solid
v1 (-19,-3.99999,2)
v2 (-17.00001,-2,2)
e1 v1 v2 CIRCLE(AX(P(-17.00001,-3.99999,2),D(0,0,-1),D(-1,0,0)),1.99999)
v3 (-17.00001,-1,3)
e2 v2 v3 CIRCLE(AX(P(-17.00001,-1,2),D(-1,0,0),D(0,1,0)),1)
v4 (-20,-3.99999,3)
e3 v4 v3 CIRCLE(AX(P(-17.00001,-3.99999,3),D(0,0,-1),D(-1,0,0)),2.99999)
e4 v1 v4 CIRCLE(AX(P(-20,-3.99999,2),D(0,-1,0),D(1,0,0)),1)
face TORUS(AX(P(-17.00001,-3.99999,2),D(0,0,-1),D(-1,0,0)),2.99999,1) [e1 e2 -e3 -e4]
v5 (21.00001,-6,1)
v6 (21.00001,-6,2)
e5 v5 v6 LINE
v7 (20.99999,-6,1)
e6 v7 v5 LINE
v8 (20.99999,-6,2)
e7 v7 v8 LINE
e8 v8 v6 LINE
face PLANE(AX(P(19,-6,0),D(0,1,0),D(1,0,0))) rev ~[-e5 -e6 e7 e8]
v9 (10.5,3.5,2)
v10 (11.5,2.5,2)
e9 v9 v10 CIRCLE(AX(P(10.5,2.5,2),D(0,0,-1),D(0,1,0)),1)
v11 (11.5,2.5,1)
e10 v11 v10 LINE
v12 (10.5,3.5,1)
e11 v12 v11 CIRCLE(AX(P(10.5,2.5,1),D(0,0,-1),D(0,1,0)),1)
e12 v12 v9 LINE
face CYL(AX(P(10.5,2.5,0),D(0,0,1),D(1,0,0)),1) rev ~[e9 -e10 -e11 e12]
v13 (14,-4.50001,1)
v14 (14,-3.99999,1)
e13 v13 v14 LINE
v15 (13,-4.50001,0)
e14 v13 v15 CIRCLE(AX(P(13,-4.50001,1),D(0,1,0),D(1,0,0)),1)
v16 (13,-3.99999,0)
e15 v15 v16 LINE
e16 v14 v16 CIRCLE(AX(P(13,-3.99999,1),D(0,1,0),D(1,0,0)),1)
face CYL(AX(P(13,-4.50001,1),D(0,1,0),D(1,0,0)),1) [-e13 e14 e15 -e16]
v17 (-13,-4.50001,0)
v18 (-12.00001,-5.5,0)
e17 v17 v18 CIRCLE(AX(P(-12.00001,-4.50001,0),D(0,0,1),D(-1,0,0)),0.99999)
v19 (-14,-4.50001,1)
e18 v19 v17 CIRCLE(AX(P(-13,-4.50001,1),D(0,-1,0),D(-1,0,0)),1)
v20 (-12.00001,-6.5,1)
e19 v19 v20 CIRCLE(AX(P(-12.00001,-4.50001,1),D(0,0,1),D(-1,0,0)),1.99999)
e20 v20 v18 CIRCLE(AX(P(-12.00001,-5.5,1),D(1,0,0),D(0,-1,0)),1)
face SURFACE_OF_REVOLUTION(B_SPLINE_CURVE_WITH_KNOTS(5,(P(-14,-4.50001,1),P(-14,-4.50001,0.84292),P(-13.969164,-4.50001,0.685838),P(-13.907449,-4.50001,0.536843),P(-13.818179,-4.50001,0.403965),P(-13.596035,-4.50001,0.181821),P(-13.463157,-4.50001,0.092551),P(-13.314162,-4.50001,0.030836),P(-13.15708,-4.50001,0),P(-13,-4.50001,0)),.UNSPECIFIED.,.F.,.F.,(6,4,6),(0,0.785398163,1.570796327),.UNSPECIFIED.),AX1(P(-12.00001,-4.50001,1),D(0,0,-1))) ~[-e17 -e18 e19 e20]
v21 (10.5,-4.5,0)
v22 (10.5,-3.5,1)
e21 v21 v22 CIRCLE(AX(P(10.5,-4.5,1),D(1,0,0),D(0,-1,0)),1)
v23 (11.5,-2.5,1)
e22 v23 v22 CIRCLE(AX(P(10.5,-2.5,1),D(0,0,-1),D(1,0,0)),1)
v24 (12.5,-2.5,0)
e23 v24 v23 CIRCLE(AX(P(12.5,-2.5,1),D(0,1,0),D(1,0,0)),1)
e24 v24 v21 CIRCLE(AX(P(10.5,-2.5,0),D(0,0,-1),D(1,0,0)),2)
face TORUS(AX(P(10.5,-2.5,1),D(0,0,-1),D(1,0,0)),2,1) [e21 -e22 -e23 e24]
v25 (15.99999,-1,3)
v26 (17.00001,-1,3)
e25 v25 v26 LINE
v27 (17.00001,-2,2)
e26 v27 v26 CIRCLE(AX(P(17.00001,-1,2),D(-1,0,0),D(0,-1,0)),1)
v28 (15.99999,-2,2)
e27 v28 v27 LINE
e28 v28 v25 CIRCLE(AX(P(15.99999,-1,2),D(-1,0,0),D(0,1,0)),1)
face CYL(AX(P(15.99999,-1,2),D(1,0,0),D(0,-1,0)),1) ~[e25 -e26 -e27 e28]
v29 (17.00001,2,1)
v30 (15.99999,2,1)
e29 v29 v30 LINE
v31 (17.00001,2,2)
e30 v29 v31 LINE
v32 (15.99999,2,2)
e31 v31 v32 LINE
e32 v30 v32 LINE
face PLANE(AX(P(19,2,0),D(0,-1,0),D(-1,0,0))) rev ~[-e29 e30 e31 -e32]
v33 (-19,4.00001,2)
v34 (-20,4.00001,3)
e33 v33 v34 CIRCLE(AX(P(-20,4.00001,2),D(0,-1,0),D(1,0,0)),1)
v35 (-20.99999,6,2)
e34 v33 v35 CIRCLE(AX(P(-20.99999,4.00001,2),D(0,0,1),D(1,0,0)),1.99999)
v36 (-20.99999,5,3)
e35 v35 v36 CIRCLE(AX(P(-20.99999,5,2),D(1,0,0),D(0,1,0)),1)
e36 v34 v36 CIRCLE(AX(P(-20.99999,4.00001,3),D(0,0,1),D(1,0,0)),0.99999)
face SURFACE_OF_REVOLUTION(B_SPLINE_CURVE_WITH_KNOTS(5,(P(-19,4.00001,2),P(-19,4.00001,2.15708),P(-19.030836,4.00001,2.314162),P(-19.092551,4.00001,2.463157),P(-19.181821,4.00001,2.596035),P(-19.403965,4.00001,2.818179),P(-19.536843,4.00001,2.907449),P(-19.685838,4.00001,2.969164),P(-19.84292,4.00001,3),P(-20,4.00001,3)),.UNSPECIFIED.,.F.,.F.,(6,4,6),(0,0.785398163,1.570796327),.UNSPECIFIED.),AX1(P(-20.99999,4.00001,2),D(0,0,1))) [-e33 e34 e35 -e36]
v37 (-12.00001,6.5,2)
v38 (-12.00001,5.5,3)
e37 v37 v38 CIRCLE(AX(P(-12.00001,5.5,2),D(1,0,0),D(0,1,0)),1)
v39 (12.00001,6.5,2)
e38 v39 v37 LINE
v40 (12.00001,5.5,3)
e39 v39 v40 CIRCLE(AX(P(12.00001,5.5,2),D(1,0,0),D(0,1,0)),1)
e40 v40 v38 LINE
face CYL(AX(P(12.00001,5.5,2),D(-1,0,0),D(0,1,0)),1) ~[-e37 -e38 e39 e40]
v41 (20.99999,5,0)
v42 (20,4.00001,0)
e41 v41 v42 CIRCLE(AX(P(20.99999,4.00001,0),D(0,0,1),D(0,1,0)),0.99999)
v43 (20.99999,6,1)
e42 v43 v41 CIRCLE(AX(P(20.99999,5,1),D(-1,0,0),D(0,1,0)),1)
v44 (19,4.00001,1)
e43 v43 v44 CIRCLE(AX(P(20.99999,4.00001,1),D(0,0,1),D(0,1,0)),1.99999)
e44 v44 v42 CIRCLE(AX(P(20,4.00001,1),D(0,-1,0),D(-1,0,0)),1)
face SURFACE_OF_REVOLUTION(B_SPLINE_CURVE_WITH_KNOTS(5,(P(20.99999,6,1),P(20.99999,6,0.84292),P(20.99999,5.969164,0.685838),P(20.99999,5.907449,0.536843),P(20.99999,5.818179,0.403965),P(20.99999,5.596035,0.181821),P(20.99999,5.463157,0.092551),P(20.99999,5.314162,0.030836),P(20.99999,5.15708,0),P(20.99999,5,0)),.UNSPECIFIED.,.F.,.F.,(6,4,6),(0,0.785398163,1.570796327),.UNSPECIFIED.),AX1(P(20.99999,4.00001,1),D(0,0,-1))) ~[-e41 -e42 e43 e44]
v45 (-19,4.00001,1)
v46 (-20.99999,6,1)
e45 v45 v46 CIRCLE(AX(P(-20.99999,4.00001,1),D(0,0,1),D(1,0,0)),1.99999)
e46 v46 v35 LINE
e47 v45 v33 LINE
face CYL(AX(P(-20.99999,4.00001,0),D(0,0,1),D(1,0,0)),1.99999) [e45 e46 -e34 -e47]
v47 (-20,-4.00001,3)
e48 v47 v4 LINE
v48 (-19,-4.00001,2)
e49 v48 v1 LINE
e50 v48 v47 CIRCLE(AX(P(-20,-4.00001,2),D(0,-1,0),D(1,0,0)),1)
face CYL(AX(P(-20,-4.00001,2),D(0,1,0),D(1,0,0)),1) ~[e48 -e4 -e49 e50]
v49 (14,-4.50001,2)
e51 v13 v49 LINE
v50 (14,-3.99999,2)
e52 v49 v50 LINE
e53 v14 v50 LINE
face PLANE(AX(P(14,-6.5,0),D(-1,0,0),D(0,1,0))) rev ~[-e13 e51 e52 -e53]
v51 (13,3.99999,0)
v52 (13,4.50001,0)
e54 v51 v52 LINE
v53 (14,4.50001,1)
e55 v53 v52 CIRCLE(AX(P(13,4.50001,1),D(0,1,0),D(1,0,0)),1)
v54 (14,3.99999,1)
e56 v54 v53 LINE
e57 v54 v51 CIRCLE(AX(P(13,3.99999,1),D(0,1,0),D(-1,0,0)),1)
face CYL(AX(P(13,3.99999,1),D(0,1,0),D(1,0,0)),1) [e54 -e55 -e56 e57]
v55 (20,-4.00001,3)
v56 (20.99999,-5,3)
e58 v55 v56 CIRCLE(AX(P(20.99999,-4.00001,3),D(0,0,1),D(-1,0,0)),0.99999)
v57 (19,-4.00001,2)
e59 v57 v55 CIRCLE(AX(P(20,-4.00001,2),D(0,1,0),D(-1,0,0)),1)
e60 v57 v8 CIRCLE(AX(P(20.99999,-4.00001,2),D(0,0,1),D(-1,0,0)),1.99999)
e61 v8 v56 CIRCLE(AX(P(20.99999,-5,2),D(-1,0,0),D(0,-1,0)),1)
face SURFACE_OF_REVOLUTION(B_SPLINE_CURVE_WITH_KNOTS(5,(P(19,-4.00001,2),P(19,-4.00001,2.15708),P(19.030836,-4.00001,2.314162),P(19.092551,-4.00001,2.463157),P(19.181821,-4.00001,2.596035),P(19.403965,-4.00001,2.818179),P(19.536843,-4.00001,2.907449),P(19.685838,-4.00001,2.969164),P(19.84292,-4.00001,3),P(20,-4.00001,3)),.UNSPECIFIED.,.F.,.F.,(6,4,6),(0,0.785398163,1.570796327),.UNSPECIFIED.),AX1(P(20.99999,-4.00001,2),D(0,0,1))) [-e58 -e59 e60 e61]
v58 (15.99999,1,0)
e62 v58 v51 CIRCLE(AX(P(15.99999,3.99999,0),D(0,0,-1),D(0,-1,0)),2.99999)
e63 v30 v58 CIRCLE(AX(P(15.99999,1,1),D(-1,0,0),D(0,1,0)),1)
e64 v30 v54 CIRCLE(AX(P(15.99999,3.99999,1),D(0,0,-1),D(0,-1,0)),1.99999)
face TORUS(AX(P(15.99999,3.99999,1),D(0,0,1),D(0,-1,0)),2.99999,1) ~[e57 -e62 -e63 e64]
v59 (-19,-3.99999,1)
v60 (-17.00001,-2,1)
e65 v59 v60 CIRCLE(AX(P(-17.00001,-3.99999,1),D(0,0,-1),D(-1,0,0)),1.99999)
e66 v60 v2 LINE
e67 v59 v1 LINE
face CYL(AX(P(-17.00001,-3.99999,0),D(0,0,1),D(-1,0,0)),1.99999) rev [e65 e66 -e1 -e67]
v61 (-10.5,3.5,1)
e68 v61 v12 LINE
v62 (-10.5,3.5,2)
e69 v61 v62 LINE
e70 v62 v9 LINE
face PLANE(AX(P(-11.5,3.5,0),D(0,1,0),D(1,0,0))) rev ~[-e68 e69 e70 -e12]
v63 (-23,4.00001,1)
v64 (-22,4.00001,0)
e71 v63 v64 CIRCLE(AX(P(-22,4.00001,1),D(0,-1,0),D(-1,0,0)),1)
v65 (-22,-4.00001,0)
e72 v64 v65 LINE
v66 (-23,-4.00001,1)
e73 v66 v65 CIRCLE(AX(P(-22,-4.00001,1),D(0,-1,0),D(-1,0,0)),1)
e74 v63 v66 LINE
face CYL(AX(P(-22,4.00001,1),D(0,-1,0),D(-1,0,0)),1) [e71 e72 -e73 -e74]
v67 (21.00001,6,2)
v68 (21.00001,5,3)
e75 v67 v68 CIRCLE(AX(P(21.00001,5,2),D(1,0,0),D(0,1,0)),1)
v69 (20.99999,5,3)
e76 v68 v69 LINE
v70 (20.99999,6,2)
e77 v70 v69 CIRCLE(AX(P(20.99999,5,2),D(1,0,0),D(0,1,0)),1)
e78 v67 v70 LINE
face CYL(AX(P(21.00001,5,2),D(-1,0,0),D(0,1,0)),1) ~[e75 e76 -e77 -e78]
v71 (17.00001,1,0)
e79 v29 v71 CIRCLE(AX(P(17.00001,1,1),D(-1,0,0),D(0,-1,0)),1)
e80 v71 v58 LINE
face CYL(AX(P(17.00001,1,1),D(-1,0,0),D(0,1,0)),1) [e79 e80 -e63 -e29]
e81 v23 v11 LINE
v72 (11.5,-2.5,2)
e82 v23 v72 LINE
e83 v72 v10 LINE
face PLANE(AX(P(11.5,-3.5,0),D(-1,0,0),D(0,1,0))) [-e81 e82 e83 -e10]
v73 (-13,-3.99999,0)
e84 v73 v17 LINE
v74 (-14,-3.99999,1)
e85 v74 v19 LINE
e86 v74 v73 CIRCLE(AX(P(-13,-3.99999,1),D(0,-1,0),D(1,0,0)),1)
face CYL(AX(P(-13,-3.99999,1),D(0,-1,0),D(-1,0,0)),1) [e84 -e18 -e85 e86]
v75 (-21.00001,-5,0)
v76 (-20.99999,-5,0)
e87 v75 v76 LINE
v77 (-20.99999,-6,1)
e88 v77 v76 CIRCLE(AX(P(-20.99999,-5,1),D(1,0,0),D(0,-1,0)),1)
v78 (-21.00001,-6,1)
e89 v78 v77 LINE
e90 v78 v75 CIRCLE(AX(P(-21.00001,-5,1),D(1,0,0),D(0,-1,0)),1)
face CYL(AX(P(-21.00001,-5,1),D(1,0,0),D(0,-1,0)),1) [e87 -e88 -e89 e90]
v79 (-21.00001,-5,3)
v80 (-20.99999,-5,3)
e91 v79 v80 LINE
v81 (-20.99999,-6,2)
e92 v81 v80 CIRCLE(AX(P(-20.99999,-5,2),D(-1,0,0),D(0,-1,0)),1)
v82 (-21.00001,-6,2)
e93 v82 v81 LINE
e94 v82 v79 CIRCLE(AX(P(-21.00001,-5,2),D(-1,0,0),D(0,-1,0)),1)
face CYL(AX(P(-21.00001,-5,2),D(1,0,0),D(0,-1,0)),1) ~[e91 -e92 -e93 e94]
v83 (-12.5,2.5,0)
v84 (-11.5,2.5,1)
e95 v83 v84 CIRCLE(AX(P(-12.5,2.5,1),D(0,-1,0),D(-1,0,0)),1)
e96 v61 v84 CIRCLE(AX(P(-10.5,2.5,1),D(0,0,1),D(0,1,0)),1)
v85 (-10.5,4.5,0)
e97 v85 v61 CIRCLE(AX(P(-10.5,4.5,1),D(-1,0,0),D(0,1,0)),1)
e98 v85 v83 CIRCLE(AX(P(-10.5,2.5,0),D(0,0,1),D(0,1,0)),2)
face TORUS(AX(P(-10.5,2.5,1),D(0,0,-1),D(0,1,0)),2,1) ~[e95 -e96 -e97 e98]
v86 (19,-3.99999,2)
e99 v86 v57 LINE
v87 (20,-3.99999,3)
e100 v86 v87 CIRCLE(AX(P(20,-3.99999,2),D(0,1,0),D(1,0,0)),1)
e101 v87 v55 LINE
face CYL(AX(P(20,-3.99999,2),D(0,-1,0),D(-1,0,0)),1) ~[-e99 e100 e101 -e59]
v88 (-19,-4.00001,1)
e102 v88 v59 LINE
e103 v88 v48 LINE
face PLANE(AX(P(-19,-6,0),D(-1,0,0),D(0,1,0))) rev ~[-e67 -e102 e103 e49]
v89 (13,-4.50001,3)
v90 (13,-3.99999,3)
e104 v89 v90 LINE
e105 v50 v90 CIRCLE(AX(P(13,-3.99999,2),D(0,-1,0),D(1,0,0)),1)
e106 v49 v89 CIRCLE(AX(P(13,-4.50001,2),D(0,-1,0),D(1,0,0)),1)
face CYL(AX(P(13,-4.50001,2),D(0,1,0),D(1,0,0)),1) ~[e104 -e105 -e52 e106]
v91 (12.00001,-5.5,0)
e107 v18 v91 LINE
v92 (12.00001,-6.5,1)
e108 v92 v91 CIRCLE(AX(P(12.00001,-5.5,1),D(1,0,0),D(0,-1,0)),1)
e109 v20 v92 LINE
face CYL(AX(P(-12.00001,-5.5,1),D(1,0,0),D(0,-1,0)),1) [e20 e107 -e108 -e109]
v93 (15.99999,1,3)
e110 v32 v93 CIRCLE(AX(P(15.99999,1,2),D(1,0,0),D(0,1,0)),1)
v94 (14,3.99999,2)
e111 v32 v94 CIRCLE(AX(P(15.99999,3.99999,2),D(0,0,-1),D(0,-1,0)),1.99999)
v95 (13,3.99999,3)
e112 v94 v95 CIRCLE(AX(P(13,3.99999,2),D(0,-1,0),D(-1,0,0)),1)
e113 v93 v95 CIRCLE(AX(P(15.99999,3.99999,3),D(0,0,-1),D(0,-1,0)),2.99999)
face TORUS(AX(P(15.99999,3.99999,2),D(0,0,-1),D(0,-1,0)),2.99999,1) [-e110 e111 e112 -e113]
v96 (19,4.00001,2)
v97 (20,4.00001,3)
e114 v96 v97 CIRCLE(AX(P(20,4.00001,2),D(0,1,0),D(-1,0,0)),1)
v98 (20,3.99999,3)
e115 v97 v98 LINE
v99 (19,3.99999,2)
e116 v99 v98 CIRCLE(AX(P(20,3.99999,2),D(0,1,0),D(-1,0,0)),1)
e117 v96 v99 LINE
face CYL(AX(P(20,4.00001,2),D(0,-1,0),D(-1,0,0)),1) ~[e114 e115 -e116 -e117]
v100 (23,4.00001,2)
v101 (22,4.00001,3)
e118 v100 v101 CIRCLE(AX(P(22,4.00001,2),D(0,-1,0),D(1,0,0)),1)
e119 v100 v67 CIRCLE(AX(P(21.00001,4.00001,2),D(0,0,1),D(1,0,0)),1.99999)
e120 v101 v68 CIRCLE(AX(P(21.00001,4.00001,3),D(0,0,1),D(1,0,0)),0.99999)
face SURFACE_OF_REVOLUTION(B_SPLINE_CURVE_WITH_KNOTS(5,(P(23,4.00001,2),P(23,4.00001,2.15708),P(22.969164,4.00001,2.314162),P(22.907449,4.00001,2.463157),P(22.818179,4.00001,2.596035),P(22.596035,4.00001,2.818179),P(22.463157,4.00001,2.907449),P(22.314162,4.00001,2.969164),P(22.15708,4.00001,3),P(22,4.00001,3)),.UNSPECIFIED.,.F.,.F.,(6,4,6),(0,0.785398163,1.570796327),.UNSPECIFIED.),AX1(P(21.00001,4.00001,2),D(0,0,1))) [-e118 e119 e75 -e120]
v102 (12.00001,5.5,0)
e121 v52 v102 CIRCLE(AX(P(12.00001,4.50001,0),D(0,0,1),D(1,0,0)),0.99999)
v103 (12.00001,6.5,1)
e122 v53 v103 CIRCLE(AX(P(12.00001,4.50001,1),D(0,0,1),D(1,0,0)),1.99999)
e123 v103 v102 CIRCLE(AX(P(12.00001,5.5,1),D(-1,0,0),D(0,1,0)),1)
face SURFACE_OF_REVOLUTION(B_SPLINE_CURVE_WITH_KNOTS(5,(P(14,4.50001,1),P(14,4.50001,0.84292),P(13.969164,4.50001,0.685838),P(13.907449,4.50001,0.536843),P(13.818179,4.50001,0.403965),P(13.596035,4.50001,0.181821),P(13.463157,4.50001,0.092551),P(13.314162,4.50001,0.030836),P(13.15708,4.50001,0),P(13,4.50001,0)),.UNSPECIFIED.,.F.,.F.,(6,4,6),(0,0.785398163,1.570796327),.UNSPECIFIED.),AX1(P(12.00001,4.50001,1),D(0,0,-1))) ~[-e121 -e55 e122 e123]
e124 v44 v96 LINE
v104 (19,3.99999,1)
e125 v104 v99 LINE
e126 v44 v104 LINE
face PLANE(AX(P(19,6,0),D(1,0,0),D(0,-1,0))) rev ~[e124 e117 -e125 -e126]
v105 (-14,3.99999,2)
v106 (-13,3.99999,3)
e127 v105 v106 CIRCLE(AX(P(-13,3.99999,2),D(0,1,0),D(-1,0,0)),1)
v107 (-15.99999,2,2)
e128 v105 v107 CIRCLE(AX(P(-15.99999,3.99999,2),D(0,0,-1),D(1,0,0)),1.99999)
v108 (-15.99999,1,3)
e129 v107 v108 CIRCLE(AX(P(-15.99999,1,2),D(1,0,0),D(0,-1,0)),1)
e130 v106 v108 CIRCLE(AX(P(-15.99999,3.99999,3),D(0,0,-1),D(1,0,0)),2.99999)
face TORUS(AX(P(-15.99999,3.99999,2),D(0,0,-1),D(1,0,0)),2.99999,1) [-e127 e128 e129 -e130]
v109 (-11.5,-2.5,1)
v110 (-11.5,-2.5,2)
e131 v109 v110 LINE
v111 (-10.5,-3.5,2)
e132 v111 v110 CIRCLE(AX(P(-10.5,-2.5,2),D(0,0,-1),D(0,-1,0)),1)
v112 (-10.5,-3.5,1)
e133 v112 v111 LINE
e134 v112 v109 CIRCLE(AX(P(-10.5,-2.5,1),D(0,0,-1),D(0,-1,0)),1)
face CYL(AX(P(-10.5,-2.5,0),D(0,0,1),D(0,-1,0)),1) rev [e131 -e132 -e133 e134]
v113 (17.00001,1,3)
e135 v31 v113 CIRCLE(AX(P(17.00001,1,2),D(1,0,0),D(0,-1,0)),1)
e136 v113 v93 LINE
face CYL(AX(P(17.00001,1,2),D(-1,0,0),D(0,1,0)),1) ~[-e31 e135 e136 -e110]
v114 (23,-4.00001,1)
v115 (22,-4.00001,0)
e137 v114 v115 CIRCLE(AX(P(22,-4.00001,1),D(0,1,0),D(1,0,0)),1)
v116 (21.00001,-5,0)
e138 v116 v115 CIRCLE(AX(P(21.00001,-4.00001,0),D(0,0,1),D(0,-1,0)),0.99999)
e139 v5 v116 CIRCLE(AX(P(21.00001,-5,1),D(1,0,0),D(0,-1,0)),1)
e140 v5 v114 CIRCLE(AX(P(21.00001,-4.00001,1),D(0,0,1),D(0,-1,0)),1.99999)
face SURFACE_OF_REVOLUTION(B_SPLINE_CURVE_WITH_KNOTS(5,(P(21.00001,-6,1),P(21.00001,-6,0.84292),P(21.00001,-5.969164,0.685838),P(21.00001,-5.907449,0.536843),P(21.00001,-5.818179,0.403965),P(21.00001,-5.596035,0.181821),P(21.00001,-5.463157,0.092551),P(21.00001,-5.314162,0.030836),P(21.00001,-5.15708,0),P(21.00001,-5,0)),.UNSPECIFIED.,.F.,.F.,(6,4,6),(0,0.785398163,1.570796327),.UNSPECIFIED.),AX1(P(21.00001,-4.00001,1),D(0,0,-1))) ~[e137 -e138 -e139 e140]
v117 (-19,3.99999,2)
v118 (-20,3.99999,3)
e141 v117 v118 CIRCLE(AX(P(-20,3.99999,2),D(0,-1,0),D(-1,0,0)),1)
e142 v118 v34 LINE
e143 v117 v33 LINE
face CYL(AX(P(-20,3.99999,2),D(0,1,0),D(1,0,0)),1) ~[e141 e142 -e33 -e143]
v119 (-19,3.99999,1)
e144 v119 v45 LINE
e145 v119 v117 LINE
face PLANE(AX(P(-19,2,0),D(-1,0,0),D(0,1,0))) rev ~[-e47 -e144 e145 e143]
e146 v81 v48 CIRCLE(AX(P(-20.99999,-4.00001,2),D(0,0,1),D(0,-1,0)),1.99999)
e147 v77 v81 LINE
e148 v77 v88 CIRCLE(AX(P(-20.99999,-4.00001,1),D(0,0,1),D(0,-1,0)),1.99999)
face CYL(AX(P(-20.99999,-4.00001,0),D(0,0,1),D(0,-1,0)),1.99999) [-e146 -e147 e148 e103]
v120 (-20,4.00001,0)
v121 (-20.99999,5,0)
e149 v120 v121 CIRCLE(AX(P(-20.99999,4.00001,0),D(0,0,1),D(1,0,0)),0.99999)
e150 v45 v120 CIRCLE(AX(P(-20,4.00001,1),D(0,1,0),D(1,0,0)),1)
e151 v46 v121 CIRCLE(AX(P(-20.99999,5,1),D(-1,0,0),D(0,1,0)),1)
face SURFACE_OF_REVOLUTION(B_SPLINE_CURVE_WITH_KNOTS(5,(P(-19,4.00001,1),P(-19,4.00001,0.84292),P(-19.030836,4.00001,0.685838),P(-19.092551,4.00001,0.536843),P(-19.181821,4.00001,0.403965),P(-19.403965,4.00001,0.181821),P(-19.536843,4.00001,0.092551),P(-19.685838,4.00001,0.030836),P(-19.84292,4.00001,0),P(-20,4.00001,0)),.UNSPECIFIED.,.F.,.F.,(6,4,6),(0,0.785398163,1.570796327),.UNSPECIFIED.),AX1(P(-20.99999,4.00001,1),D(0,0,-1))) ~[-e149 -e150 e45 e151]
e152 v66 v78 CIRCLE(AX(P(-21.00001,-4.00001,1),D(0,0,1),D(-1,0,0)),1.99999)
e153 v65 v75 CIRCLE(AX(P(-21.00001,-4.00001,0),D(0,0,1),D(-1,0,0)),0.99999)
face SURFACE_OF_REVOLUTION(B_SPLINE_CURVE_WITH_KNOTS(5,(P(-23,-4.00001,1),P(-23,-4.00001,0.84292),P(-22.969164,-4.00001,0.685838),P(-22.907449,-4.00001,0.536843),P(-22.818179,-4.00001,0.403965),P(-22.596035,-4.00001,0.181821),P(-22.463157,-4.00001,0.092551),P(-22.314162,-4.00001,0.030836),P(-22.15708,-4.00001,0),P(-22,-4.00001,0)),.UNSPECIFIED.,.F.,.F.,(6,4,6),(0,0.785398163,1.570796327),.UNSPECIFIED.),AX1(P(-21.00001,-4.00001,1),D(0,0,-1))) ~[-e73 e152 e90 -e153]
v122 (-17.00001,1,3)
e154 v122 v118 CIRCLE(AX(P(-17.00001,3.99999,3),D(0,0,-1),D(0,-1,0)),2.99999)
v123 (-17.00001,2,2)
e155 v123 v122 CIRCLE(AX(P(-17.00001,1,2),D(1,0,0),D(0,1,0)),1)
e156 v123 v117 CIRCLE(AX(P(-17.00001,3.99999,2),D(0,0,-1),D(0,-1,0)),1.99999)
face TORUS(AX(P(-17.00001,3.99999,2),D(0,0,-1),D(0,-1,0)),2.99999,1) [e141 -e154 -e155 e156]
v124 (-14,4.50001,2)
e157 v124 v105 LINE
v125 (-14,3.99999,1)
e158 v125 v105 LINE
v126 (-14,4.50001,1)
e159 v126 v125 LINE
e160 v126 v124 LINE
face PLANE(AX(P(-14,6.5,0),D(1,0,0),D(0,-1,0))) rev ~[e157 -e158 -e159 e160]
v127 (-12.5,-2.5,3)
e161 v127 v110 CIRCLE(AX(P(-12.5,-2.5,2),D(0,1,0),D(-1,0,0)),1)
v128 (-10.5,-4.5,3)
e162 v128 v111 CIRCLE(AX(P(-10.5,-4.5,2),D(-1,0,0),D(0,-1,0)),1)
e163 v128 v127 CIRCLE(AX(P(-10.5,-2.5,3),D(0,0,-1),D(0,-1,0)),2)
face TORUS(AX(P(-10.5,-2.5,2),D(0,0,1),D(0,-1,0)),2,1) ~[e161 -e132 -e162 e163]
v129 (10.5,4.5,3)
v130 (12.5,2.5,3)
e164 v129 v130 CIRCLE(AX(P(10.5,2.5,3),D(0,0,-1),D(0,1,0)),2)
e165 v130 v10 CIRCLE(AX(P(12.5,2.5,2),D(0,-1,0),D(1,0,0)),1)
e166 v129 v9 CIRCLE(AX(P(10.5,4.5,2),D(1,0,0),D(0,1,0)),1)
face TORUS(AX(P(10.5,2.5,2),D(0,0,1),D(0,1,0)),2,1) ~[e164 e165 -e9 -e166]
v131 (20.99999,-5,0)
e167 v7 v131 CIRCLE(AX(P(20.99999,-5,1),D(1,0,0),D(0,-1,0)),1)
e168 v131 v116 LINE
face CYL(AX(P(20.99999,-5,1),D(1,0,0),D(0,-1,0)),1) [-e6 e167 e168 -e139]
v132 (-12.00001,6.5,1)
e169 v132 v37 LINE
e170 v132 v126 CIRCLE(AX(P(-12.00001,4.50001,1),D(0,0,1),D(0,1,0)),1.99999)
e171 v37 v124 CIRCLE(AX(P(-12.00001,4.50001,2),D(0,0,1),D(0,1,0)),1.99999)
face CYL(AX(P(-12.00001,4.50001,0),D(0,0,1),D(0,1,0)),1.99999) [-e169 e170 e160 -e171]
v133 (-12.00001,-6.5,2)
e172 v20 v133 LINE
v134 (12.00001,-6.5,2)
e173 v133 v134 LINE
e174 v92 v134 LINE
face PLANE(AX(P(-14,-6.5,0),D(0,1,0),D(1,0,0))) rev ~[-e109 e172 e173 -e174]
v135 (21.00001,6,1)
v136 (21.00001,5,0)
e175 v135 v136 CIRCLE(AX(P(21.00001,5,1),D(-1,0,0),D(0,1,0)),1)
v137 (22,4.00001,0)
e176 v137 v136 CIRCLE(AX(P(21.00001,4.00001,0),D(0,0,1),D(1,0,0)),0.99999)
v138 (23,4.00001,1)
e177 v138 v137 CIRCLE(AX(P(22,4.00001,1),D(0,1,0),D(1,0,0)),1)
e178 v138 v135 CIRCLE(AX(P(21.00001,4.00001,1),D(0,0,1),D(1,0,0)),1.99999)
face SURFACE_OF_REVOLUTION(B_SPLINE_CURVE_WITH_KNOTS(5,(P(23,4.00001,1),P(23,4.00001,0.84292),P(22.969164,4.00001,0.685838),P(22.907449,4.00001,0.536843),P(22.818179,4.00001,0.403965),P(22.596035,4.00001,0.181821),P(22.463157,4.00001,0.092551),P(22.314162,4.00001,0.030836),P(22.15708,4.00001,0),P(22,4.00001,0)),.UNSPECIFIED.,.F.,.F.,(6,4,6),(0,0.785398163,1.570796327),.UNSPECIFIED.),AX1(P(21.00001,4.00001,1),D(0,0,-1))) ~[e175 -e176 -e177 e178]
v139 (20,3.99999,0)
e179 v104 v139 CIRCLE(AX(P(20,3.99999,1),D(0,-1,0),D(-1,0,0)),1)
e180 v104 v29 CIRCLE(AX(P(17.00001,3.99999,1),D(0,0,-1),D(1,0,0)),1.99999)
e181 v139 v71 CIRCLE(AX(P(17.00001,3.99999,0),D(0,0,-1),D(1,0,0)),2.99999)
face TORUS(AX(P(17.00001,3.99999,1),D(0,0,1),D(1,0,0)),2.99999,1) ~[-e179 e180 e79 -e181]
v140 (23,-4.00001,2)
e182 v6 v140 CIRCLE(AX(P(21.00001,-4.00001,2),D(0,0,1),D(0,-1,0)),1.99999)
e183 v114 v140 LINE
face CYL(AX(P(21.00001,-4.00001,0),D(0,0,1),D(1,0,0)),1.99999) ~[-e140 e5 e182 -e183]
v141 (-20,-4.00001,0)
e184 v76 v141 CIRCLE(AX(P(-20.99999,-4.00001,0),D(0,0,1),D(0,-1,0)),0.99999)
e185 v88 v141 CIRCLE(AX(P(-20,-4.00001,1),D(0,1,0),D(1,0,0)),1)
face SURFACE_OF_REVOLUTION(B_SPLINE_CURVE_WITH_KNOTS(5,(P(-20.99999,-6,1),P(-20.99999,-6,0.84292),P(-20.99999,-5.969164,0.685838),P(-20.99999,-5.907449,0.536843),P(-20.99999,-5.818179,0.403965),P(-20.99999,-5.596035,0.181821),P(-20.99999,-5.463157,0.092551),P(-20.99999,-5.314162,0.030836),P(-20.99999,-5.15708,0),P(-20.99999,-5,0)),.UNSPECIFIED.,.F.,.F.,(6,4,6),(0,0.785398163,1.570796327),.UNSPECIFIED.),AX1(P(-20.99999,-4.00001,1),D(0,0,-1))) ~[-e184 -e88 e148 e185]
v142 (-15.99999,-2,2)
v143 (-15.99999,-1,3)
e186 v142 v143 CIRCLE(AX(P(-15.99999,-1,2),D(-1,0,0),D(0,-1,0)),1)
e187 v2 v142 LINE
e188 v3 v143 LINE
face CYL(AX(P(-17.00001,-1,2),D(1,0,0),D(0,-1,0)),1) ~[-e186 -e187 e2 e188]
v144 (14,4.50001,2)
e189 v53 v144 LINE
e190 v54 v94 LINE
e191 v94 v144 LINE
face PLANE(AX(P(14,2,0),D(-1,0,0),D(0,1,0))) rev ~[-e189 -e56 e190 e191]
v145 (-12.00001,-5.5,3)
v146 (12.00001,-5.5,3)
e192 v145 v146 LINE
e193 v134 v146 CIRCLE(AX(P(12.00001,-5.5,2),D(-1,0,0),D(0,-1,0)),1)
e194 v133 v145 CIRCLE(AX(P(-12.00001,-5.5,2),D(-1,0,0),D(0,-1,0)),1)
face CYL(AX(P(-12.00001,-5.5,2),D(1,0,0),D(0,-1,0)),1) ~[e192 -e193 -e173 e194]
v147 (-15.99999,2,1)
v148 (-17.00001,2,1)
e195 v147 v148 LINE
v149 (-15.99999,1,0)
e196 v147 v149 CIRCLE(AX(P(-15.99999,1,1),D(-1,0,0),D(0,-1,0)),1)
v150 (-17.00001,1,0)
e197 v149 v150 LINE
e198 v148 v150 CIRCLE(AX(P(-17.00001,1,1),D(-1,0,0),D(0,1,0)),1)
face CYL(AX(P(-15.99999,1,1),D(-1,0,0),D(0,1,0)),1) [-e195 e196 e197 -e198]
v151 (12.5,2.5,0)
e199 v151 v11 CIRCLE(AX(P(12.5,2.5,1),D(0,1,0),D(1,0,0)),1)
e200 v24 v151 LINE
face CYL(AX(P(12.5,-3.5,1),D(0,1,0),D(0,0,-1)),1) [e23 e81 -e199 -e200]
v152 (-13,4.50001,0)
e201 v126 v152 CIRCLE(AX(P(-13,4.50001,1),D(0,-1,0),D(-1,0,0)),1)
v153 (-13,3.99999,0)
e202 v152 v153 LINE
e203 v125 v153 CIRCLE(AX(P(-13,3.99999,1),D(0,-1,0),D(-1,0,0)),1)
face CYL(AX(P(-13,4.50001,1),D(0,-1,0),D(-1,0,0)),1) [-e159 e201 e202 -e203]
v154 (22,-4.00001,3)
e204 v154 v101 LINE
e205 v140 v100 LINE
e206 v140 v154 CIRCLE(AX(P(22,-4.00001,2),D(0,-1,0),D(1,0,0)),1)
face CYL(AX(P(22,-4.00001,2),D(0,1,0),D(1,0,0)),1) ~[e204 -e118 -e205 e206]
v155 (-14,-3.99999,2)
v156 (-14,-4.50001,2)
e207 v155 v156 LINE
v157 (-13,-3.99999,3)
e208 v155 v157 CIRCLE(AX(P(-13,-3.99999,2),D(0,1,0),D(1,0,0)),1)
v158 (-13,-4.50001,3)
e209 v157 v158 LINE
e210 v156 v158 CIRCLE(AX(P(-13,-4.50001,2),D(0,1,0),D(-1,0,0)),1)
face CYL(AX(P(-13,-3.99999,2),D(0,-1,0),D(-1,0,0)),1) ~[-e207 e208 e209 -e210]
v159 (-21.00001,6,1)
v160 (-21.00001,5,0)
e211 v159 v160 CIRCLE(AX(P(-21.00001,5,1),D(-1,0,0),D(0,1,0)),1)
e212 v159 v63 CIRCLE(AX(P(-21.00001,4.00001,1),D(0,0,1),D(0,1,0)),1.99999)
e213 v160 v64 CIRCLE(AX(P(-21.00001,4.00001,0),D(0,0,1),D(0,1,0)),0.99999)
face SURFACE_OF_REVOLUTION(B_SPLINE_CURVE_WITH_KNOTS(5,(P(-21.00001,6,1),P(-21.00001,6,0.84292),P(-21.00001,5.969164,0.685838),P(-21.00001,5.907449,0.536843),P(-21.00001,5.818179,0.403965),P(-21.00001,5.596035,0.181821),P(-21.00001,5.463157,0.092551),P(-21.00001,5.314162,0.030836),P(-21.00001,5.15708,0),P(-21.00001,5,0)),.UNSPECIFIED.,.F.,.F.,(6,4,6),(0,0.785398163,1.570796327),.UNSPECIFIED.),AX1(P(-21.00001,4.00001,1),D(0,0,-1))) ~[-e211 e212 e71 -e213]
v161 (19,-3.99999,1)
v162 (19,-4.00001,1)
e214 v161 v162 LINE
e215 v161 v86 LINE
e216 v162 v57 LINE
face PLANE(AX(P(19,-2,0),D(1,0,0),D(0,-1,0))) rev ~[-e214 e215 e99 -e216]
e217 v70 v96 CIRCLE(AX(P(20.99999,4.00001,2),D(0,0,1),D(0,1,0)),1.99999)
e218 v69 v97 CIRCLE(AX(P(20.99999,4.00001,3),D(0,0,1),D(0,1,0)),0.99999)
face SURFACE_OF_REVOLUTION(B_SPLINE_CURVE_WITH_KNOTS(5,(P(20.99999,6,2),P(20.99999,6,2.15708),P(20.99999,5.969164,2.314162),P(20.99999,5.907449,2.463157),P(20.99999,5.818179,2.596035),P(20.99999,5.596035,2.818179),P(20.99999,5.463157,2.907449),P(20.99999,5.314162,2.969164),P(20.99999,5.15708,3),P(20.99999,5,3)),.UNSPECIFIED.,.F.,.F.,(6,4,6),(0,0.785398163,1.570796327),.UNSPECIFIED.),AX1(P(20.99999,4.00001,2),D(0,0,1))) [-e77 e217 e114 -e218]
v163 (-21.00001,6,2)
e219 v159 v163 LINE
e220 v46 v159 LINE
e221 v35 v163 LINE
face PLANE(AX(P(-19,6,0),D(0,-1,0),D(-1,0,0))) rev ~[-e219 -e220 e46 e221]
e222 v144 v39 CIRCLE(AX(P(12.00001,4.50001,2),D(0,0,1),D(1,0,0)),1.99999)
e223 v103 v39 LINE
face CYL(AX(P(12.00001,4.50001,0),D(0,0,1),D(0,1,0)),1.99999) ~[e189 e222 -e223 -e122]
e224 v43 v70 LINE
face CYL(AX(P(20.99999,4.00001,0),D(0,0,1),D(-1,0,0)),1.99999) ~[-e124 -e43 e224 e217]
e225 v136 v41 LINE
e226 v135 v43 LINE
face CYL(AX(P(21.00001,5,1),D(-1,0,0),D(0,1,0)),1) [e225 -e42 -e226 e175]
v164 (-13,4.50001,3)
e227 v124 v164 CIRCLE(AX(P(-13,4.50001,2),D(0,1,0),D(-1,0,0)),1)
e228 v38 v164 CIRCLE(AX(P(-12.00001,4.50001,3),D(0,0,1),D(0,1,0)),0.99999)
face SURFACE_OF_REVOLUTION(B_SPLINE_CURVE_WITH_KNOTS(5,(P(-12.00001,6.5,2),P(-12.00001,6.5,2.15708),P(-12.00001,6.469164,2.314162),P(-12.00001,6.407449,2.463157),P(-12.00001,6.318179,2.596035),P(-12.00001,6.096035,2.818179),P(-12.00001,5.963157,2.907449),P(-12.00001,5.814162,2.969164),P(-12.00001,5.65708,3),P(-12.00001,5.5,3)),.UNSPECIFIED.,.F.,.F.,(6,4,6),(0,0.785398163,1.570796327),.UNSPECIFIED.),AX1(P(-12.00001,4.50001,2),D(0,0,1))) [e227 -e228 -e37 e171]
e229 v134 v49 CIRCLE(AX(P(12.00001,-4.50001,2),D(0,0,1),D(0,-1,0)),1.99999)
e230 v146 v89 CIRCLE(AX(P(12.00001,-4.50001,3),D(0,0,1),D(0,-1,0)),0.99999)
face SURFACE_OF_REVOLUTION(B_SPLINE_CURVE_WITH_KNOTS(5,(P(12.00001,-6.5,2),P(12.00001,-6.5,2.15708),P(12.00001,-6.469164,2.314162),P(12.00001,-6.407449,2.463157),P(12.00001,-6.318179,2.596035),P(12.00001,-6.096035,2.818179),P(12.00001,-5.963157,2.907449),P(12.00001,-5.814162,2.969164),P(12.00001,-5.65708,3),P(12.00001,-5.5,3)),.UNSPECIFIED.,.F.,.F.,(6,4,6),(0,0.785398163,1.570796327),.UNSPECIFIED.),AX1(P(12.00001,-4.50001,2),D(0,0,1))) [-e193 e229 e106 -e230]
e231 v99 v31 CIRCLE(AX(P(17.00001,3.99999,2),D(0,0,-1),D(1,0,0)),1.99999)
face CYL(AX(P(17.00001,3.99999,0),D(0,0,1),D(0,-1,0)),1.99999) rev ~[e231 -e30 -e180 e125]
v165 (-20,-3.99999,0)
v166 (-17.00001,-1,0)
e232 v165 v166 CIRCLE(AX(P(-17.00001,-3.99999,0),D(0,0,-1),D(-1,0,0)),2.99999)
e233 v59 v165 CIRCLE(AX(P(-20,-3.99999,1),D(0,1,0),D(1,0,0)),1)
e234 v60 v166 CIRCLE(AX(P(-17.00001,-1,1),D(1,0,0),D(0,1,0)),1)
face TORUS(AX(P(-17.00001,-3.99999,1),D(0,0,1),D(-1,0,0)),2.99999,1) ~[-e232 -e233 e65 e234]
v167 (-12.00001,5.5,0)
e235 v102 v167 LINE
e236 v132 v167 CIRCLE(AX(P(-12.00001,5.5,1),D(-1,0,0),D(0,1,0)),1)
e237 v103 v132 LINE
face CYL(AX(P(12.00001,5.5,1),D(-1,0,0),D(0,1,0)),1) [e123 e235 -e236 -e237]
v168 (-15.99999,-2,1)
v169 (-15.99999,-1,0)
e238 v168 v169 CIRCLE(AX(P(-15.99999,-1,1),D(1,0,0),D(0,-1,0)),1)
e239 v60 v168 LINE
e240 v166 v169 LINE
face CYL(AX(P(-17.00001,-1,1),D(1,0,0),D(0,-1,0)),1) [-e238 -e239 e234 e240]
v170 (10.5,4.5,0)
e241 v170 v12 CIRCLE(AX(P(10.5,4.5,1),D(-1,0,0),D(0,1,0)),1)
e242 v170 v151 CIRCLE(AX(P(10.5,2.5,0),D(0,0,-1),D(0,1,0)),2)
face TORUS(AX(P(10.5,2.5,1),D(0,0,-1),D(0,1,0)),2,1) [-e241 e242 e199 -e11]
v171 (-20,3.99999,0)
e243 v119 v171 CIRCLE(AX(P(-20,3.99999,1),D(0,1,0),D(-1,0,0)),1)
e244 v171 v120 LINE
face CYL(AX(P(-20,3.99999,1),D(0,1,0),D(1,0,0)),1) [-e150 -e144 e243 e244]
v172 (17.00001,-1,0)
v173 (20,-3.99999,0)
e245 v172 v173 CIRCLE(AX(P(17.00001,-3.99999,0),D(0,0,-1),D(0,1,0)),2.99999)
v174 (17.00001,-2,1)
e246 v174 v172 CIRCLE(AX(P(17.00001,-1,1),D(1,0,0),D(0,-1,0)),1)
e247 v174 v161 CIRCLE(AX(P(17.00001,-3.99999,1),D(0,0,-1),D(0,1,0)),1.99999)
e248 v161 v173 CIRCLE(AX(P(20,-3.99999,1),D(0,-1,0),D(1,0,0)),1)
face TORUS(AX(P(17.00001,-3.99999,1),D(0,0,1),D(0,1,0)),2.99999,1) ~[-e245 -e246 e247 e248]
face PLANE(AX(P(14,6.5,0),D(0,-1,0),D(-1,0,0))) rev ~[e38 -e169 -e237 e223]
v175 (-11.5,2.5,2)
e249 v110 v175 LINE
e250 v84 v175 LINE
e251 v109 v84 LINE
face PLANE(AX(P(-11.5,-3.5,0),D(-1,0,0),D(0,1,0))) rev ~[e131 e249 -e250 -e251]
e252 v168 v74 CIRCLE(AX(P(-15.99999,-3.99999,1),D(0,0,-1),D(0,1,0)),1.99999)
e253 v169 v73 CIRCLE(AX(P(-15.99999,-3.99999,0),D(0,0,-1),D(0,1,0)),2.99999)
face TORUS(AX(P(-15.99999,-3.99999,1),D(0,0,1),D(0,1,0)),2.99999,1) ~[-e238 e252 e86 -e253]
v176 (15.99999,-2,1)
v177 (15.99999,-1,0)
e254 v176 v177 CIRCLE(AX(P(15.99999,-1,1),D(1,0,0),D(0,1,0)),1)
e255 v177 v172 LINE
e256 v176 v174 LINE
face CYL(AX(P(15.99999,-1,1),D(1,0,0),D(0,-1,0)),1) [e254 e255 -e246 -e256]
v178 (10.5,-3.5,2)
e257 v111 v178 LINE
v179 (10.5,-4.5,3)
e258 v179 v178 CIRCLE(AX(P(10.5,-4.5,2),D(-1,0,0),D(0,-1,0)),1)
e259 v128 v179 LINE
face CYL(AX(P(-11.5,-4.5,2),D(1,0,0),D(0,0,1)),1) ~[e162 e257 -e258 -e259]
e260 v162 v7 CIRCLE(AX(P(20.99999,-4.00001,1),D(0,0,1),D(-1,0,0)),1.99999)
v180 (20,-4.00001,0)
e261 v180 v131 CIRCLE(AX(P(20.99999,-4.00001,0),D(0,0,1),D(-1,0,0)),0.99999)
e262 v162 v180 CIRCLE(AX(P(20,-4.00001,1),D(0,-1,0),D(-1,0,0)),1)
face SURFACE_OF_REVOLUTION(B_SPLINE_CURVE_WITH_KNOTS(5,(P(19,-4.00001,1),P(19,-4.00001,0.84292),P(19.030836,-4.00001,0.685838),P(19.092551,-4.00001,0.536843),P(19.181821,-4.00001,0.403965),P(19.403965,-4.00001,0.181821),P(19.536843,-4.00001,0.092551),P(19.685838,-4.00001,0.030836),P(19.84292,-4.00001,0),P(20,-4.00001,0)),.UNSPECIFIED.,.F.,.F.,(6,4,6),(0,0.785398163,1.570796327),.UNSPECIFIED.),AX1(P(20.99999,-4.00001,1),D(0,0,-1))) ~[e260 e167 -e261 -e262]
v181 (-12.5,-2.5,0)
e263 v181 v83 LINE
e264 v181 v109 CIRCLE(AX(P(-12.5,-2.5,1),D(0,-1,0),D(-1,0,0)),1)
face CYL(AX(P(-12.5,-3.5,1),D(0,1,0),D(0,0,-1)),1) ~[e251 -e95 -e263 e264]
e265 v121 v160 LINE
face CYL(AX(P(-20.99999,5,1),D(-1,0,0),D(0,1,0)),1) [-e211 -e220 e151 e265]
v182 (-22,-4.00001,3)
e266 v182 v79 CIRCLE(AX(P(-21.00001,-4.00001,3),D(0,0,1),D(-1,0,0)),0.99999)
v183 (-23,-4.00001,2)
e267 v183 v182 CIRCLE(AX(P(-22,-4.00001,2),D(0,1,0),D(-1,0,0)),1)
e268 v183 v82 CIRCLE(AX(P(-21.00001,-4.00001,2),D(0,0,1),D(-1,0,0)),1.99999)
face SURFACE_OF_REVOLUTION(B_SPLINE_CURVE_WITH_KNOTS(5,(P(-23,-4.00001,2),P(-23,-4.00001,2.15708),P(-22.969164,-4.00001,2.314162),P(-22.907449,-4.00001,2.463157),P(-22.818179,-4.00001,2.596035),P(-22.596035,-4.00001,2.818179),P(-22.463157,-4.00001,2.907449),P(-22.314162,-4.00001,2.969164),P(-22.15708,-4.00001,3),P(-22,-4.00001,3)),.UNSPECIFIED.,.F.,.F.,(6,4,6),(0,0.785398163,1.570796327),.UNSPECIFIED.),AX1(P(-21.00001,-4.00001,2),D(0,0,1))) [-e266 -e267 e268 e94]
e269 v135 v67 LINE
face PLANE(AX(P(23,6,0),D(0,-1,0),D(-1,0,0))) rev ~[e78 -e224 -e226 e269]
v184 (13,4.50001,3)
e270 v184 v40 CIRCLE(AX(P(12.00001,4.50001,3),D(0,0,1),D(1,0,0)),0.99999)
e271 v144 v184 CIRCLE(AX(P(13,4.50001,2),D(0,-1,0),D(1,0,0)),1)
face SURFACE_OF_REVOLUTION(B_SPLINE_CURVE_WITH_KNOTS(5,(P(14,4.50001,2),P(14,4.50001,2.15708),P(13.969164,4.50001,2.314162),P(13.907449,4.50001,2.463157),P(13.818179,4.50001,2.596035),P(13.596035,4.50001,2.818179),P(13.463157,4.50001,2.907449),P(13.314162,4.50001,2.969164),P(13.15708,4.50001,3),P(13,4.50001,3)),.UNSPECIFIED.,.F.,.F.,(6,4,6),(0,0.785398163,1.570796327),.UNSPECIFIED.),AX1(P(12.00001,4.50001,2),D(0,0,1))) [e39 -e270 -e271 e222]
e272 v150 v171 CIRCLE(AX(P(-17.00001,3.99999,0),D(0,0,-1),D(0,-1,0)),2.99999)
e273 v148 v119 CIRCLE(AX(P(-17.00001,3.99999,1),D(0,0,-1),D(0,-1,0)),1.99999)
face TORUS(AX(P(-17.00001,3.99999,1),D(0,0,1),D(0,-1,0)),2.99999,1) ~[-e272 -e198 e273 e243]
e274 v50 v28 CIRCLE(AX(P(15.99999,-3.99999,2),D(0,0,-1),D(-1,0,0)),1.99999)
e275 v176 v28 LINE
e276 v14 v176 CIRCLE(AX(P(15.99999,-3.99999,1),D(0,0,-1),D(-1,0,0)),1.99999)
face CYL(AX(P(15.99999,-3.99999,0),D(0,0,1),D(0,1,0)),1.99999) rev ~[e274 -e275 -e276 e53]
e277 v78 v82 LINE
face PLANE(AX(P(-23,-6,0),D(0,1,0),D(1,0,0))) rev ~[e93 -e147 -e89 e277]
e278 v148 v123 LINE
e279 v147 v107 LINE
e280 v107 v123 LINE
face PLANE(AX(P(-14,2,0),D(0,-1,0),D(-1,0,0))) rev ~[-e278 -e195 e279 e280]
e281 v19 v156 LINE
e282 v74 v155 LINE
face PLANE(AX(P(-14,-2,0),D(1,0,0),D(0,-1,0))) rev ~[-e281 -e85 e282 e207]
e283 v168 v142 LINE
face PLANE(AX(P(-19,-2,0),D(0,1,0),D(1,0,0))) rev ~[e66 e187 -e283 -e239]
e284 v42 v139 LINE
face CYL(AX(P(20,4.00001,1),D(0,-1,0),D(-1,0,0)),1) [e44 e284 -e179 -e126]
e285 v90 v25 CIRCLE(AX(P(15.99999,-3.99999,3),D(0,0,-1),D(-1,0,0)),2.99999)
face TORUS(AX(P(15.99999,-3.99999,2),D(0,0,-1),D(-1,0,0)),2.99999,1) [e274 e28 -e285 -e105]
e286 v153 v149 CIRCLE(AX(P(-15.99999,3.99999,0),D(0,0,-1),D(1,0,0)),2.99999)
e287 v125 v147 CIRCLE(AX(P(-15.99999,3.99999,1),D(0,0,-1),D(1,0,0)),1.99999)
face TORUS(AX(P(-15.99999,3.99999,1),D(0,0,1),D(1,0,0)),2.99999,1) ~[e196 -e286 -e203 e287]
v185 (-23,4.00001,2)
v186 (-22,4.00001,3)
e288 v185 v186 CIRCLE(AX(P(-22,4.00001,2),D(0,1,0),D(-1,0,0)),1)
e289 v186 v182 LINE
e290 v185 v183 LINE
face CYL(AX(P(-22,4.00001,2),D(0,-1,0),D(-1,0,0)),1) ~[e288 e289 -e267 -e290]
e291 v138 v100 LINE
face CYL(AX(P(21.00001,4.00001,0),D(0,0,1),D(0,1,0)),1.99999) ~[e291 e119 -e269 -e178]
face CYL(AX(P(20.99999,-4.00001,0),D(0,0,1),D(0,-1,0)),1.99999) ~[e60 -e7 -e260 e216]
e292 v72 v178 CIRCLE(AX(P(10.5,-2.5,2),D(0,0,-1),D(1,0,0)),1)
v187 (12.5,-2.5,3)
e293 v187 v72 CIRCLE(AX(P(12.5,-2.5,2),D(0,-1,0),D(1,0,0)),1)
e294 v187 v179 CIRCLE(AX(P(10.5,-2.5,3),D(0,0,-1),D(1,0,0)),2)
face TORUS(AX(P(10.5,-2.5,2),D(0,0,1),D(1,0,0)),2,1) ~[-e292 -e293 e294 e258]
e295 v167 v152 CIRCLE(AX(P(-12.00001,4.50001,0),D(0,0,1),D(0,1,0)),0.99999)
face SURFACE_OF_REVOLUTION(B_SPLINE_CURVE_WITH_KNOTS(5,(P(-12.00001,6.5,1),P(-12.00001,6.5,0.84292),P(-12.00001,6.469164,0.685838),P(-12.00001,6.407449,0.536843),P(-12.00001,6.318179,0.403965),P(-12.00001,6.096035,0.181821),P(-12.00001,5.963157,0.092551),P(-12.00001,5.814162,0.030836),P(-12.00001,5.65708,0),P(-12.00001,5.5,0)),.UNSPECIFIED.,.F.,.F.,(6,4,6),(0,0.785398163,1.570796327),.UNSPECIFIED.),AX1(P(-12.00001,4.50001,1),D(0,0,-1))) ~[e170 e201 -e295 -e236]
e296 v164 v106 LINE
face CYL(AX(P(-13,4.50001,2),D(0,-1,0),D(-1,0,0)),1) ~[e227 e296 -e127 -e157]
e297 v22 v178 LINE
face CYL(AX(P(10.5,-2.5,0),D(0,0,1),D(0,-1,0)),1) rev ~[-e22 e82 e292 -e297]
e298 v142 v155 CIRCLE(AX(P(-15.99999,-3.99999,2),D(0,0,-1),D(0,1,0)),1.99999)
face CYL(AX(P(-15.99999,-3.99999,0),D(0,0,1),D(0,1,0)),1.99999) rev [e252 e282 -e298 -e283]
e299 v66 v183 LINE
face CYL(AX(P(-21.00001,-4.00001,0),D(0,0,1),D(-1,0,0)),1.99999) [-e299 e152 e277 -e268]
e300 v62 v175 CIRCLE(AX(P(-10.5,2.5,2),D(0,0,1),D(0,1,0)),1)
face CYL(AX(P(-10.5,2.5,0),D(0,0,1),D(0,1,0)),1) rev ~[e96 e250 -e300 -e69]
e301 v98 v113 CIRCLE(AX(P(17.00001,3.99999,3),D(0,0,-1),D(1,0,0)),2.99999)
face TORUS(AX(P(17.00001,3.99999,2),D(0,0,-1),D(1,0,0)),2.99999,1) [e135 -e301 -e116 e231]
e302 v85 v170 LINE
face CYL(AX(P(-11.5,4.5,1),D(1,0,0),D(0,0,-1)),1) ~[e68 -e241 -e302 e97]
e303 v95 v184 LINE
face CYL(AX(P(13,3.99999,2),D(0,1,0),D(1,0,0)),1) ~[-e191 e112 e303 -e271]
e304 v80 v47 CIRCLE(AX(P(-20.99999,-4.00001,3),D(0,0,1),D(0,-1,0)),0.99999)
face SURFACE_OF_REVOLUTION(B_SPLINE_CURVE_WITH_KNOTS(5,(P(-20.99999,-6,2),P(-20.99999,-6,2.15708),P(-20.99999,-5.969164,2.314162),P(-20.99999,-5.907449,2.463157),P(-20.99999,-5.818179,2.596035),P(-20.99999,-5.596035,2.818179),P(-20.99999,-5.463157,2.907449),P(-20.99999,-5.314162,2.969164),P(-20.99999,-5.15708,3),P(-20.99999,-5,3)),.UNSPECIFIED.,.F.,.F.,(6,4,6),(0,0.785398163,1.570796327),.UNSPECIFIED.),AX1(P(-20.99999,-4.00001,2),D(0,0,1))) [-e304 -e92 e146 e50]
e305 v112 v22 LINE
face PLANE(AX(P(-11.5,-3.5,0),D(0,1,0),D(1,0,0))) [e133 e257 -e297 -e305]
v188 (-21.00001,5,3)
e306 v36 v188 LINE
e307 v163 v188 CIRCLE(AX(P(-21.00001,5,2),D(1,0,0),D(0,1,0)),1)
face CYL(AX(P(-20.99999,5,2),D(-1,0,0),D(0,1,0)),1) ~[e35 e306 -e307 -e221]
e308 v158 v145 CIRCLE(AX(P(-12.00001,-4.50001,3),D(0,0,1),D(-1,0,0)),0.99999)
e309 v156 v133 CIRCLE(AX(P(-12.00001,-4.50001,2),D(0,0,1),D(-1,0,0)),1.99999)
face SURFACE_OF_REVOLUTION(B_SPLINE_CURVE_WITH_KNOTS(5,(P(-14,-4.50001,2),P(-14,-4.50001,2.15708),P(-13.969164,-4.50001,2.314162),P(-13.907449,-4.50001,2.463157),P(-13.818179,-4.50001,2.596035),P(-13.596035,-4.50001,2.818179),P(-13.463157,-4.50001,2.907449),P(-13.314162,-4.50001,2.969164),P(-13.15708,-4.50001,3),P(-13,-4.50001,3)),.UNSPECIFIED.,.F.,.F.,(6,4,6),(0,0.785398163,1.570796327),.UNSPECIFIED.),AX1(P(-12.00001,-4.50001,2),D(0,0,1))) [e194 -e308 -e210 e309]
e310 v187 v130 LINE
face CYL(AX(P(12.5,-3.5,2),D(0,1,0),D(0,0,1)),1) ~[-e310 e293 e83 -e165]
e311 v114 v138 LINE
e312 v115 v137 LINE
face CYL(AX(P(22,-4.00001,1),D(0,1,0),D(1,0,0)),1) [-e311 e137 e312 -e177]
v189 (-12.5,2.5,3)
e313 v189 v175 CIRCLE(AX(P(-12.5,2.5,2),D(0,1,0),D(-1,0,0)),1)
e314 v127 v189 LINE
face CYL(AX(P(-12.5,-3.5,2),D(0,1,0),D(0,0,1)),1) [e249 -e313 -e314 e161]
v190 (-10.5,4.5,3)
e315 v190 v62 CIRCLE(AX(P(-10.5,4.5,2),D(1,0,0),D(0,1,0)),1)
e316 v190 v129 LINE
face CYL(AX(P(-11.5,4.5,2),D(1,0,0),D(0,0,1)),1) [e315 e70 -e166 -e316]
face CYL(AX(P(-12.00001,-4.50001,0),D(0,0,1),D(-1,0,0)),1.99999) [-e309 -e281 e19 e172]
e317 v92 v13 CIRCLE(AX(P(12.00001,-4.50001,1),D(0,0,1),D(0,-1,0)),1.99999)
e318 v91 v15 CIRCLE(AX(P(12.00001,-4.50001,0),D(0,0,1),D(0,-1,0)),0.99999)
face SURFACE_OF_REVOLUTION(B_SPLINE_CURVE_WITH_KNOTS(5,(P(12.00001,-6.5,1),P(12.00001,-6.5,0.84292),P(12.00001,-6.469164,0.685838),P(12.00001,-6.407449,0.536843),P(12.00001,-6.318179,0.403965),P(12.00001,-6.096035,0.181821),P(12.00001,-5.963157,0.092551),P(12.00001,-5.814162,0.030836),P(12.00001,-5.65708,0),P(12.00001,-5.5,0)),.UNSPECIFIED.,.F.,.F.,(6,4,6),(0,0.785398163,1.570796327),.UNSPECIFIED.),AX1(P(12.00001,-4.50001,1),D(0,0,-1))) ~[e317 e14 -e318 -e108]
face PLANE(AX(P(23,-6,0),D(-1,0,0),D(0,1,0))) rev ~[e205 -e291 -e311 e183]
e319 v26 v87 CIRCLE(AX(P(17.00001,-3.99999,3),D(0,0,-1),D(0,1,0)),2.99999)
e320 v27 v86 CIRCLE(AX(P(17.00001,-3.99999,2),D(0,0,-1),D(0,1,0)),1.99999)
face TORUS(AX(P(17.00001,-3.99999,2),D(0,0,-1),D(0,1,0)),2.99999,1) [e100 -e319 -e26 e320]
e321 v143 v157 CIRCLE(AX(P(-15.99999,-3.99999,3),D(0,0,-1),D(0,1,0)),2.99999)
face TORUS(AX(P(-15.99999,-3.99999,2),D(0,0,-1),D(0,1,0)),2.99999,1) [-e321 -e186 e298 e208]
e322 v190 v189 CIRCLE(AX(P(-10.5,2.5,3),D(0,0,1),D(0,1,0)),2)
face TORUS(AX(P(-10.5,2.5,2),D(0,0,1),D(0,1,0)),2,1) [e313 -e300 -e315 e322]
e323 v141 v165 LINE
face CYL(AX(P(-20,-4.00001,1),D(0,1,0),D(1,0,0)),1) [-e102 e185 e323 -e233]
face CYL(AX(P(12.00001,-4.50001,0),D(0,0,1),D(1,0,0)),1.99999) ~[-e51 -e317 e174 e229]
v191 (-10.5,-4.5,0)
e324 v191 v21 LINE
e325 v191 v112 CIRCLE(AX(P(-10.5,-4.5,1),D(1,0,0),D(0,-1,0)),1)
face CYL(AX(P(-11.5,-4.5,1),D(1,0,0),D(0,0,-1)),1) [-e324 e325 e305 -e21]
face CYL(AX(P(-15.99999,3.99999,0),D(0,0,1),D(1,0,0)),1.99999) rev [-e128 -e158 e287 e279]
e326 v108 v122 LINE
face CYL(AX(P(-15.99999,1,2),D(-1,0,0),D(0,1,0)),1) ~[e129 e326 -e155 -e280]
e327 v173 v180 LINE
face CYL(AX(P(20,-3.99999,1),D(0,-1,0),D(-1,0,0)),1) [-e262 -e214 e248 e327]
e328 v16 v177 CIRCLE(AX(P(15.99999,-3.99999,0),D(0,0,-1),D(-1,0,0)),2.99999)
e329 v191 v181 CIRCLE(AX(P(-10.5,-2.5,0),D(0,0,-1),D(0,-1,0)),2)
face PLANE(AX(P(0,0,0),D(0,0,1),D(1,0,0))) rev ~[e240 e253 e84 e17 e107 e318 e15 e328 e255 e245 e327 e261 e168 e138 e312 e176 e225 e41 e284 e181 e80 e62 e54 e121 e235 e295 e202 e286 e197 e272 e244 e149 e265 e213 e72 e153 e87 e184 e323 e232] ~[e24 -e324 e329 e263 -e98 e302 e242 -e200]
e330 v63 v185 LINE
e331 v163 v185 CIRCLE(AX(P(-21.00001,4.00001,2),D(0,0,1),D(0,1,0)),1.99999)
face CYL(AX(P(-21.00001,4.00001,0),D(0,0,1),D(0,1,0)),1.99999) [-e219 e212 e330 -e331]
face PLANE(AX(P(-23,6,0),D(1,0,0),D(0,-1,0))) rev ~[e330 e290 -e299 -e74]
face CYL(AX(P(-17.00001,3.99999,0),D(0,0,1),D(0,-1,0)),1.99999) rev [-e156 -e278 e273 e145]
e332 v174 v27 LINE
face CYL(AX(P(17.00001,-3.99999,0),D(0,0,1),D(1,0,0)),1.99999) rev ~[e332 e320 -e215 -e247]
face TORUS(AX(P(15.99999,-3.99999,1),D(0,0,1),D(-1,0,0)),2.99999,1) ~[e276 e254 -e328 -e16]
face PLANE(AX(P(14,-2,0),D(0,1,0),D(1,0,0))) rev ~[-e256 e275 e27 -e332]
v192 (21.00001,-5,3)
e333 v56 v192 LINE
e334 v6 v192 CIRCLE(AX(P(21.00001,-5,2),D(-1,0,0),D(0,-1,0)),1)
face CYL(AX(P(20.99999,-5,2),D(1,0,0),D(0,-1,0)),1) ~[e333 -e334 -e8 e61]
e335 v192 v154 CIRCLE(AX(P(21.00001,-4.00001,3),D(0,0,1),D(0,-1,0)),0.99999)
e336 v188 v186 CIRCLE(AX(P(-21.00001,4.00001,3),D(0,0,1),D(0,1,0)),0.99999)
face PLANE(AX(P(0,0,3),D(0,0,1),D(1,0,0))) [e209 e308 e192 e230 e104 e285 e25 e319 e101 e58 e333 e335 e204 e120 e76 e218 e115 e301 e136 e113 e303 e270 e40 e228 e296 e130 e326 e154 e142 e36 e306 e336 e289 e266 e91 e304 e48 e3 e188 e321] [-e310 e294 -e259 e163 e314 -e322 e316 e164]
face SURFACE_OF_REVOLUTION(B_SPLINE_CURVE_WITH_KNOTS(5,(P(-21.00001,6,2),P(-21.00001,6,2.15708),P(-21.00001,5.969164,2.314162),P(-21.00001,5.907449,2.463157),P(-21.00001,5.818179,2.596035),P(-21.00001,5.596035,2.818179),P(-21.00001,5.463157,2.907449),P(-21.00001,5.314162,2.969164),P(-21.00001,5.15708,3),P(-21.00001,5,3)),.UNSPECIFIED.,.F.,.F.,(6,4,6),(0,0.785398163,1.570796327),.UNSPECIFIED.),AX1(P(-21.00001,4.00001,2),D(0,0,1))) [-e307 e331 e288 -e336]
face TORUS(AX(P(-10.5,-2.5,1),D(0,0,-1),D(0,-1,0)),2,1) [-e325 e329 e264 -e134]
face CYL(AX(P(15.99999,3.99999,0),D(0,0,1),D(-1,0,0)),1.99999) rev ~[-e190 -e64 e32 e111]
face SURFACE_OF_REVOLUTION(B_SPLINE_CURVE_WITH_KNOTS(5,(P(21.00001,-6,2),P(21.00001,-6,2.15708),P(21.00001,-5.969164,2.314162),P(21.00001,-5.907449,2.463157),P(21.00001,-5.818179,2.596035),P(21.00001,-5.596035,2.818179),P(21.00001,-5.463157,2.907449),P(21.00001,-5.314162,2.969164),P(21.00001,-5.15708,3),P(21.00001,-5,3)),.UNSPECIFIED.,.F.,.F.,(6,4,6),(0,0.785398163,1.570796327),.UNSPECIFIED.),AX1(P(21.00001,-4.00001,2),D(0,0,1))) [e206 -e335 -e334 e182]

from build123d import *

# Parameters (mm, degrees)
F0_W     = 23
F0_H     = 7
F1_DEPTH = 3
F2_R     = 1.99999
F3_R     = 1


# Not quite as in the source:
# - a fillet or chamfer is up to 0.001 mm smaller than in the source, because OpenCascade refuses the exact size
# - a feature names something its author has since deleted; it is built from what else it names


with BuildPart() as f1:
    # F0 (on Top) → F1 (new body)
    with BuildSketch(Plane.XY):
        Polygon((14, 6.5), (-14, 6.5), (-14, 2), (-19, 2), (-19, 6), (-23, 6), (-23, 0), (-23, -6), (-19, -6), (-19, -2), (-14, -2), (-14, -6.5), (14, -6.5), (14, -2), (19, -2), (19, -6), (23, -6), (23, 0), (23, 6), (19, 6), (19, 2), (14, 2), align=None)
        Rectangle(F0_W, F0_H, mode=Mode.SUBTRACT)
    extrude(amount=F1_DEPTH)

    # F2 (radius 2 in the source; OpenCascade refuses exactly that, so slightly less here)
    f2_edges = [f1.edges().sort_by_distance(p)[0] for p in [
        (14, 6.5, 1.5),
        (-14, 6.5, 1.5),
        (14, -2, 1.5),
        (-14, -2, 1.5),
        (19, -2, 1.5),
        (19, 2, 1.5),
        (-19, 2, 1.5),
        (-19, -2, 1.5),
        (-19, -6, 1.5),
        (-23, -6, 1.5),
        (-23, 6, 1.5),
        (19, -6, 1.5),
        (23, -6, 1.5),
        (-19, 6, 1.5),
        (19, 6, 1.5),
        (23, 6, 1.5),
        (14, 2, 1.5),
        (14, -6.5, 1.5),
        (-14, -6.5, 1.5),
        (-14, 2, 1.5),
    ]]
    fillet(f2_edges, radius=F2_R)

    # F3
    f3_edges = [f1.edges().sort_by_distance(p)[0] for p in [
        (-11.5, 3.5, 1.5),
        (-11.5, -3.5, 1.5),
        (0, 6.5, 0),
        (13.414216, 5.914216, 0),
        (-13.414216, 5.914216, 0),
        (14, 4.25, 0),
        (-14, 4.25, 0),
        (14.585784, 2.585784, 0),
        (-14.585784, 2.585784, 0),
        (16.5, 2, 0),
        (-16.5, 2, 0),
        (18.414216, 2.585784, 0),
        (-18.414216, 2.585784, 0),
        (19, 4, 0),
        (-19, 4, 0),
        (19.585784, 5.414216, 0),
        (-19.585784, 5.414216, 0),
        (21, 6, 0),
        (-21, 6, 0),
        (22.414216, 5.414216, 0),
        (-22.414216, 5.414216, 0),
        (23, 0, 0),
        (-23, 0, 0),
        (22.414216, -5.414216, 0),
        (-22.414216, -5.414216, 0),
        (21, -6, 0),
        (-21, -6, 0),
        (19.585784, -5.414216, 0),
        (-19.585784, -5.414216, 0),
        (19, -4, 0),
        (-19, -4, 0),
        (18.414216, -2.585784, 0),
        (-18.414216, -2.585784, 0),
        (16.5, -2, 0),
        (-16.5, -2, 0),
        (14.585784, -2.585784, 0),
        (-14.585784, -2.585784, 0),
        (14, -4.25, 0),
        (-14, -4.25, 0),
        (13.414216, -5.914216, 0),
        (-13.414216, -5.914216, 0),
        (0, -6.5, 0),
        (0, 3.5, 0),
        (11.5, 0, 0),
        (0, -3.5, 0),
        (-11.5, 0, 0),
        (0, 6.5, 3),
        (13.414216, 5.914216, 3),
        (-13.414216, 5.914216, 3),
        (14, 4.25, 3),
        (-14, 4.25, 3),
        (14.585784, 2.585784, 3),
        (-14.585784, 2.585784, 3),
        (16.5, 2, 3),
        (-16.5, 2, 3),
        (18.414216, 2.585784, 3),
        (-18.414216, 2.585784, 3),
        (19, 4, 3),
        (-19, 4, 3),
        (19.585784, 5.414216, 3),
        (-19.585784, 5.414216, 3),
        (21, 6, 3),
        (-21, 6, 3),
        (22.414216, 5.414216, 3),
        (-22.414216, 5.414216, 3),
        (23, 0, 3),
        (-23, 0, 3),
        (22.414216, -5.414216, 3),
        (-22.414216, -5.414216, 3),
        (21, -6, 3),
        (-21, -6, 3),
        (19.585784, -5.414216, 3),
        (-19.585784, -5.414216, 3),
        (19, -4, 3),
        (-19, -4, 3),
        (18.414216, -2.585784, 3),
        (-18.414216, -2.585784, 3),
        (16.5, -2, 3),
        (-16.5, -2, 3),
        (14.585784, -2.585784, 3),
        (-14.585784, -2.585784, 3),
        (14, -4.25, 3),
        (-14, -4.25, 3),
        (13.414216, -5.914216, 3),
        (-13.414216, -5.914216, 3),
        (0, -6.5, 3),
        (0, 3.5, 3),
        (11.5, 0, 3),
        (0, -3.5, 3),
        (-11.5, 0, 3),
        (11.5, 3.5, 1.5),
        (11.5, -3.5, 1.5),
    ]]
    fillet(f3_edges, radius=F3_R)


solid = f1.part
